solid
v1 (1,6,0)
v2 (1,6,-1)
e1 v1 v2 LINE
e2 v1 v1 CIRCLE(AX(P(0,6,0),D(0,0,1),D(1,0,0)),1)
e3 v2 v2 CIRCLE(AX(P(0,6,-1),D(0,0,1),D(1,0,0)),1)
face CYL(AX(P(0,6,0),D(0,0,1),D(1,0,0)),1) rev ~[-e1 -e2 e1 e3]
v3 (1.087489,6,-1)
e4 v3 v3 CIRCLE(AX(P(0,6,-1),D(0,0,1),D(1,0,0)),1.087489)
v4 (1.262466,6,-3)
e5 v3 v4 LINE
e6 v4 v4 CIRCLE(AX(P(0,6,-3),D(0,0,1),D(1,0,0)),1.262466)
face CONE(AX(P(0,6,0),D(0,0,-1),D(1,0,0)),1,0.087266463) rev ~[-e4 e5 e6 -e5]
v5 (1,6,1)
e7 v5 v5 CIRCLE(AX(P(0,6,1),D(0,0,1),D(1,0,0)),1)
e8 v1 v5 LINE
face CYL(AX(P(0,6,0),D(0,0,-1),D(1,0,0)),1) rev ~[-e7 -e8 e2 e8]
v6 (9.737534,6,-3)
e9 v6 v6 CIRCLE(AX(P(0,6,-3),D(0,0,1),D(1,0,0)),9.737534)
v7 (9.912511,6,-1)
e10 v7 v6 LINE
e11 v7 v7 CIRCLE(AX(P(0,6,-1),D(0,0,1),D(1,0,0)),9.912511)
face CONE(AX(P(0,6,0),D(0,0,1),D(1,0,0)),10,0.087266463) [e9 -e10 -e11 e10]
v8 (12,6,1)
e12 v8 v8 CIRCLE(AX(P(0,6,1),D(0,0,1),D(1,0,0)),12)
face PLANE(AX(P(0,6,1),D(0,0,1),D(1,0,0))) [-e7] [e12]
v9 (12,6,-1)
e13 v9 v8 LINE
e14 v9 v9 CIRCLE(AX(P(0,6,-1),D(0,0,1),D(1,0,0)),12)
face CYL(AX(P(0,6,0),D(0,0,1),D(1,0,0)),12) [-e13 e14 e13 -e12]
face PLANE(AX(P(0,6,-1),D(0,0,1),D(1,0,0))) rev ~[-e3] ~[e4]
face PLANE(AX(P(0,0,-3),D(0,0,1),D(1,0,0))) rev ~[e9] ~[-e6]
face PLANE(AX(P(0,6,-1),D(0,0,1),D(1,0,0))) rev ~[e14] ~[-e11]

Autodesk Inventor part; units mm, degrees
ref_plane "YZ Plane" through (0, 0, 0) normal (1, 0, 0) x (0, 1, 0)
ref_plane "XZ Plane" through (0, 0, 0) normal (0, 1, 0) x (-1, 0, 0)
ref_plane "XY Plane" through (0, 0, 0) normal (0, 0, 1) x (1, 0, 0)
ref_plane "Arbeitsebene1" through (0, 0, 0) normal (0, 0, 1) x (1, 0, 0)
sketch "Skizze1" plane through (0, 0, 0) normal (0, 0, 1) x (1, 0, 0)
  line L0 (-6, -30.9) -> (-6, -18.4)
  line L1 (-6, -30.9) -> (-19.3, -30.9)
  line L2 (-19.3, -30.9) -> (-19.3, -33.9)
  line L3 (10.7, -33.9) -> (-19.3, -33.9)
  line L4 (10.7, -30.9) -> (10.7, -33.9)
  line L5 (10.7, -30.9) -> (6, -30.9)
  line L6 (6, -18.4) -> (6, -30.9)
  line L7 (16.5, -18.4) -> (6, -18.4)
  line L8 (16.5, -15.118081) -> (16.5, -18.4)
  line L9 (21.118081, -10.5) -> (16.5, -15.118081)
  line L10 (24.4, -10.5) -> (21.118081, -10.5)
  line L11 (24.4, 22.5) -> (24.4, -10.5)
  line L12 (21.118081, 22.5) -> (24.4, 22.5)
  line L13 (16.5, 27.118081) -> (21.118081, 22.5)
  line L14 (16.5, 30.4) -> (16.5, 27.118081)
  line L15 (-16.5, 30.4) -> (-2.249898, 30.4)
  line L16 (-16.5, 27.118081) -> (-16.5, 30.4)
  line L17 (-21.118081, 22.5) -> (-16.5, 27.118081)
  line L18 (-24.4, 22.5) -> (-21.118081, 22.5)
  line L19 (-24.4, -10.5) -> (-24.4, 22.5)
  line L20 (-21.118081, -10.5) -> (-24.4, -10.5)
  line L21 (-16.5, -15.118081) -> (-21.118081, -10.5)
  line L22 (-16.5, -18.4) -> (-16.5, -15.118081)
  line L23 (-6, -18.4) -> (-16.5, -18.4)
  spline S0 degree 2 poles (21.854355, -9.517776) (21.708528, -9.626528) (21.308123, -9.745166) (21.028828, -9.745166) knots 0 0 0 1 2 2 2
  spline S1 degree 2 poles (21.028828, -9.745166) (20.776721, -9.745166) (20.324412, -9.633942) (20.176113, -9.559793) knots 0 0 0 1 2 2 2
  line L24 (20.176113, -9.559793) -> (20.176113, -8.954242)
  line L25 (20.176113, -8.954242) -> (20.235433, -8.954242)
  spline S2 degree 2 poles (20.235433, -8.954242) (20.287337, -8.993788) (20.418334, -9.087711) (20.534501, -9.139615) knots 0 0 0 1 2 2 2
  spline S3 degree 2 poles (20.534501, -9.139615) (20.635838, -9.186576) (20.885473, -9.25331) (21.033771, -9.25331) knots 0 0 0 1 2 2 2
  spline S4 degree 2 poles (21.033771, -9.25331) (21.184541, -9.25331) (21.416875, -9.159388) (21.416875, -9.058051) knots 0 0 0 1 2 2 2
  spline S5 degree 2 poles (21.416875, -9.058051) (21.416875, -8.978959) (21.310595, -8.894923) (21.157353, -8.86032) knots 0 0 0 1 2 2 2
  spline S6 degree 2 poles (21.157353, -8.86032) (21.075789, -8.838075) (20.826154, -8.791114) (20.72976, -8.761455) knots 0 0 0 1 2 2 2
  spline S7 degree 2 poles (20.72976, -8.761455) (20.45788, -8.677419) (20.186, -8.348691) (20.186, -8.079283) knots 0 0 0 1 2 2 2
  spline S8 degree 2 poles (20.186, -8.079283) (20.186, -7.926041) (20.326883, -7.654161) (20.465295, -7.547881) knots 0 0 0 1 2 2 2
  spline S9 degree 2 poles (20.465295, -7.547881) (20.601235, -7.444072) (21.004112, -7.32049) (21.25869, -7.32049) knots 0 0 0 1 2 2 2
  spline S10 degree 2 poles (21.25869, -7.32049) (21.500911, -7.32049) (21.906259, -7.416884) (22.044671, -7.483618) knots 0 0 0 1 2 2 2
  line L26 (22.044671, -7.483618) -> (22.044671, -8.066925)
  line L27 (22.044671, -8.066925) -> (21.987823, -8.066925)
  spline S11 degree 2 poles (21.987823, -8.066925) (21.950749, -8.037265) (21.790092, -7.940871) (21.715943, -7.906268) knots 0 0 0 1 2 2 2
  spline S12 degree 2 poles (21.715943, -7.906268) (21.624493, -7.866722) (21.402045, -7.812346) (21.285878, -7.812346) knots 0 0 0 1 2 2 2
  spline S13 degree 2 poles (21.285878, -7.812346) (21.130165, -7.812346) (20.915133, -7.918626) (20.915133, -8.005134) knots 0 0 0 1 2 2 2
  spline S14 degree 2 poles (20.915133, -8.005134) (20.915133, -8.084226) (21.021413, -8.173205) (21.199371, -8.217694) knots 0 0 0 1 2 2 2
  spline S15 degree 2 poles (21.199371, -8.217694) (21.290822, -8.239939) (21.53057, -8.281957) (21.641794, -8.319032) knots 0 0 0 1 2 2 2
  spline S16 degree 2 poles (21.641794, -8.319032) (21.888958, -8.398124) (22.146008, -8.707079) (22.146008, -8.964129) knots 0 0 0 1 2 2 2
  spline S17 degree 2 poles (22.146008, -8.964129) (22.146008, -9.124785) (21.995238, -9.41891) (21.854355, -9.517776) knots 0 0 0 1 2 2 2
  spline S18 degree 2 poles (16.997588, -9.685847) (16.893779, -9.715506) (16.710878, -9.745166) (16.560108, -9.745166) knots 0 0 0 1 2 2 2
  spline S19 degree 2 poles (16.560108, -9.745166) (16.27587, -9.745166) (15.803787, -9.601811) (15.628301, -9.453513) knots 0 0 0 1 2 2 2
  spline S20 degree 2 poles (15.628301, -9.453513) (15.457758, -9.302743) (15.264971, -8.850434) (15.264971, -8.543951) knots 0 0 0 1 2 2 2
  spline S21 degree 2 poles (15.264971, -8.543951) (15.264971, -8.212751) (15.472588, -7.750555) (15.653018, -7.602257) knots 0 0 0 1 2 2 2
  spline S22 degree 2 poles (15.653018, -7.602257) (15.823561, -7.458902) (16.288228, -7.32049) (16.540335, -7.32049) knots 0 0 0 1 2 2 2
  spline S23 degree 2 poles (16.540335, -7.32049) (16.730651, -7.32049) (17.111283, -7.409469) (17.304071, -7.505863) knots 0 0 0 1 2 2 2
  line L28 (17.304071, -7.505863) -> (17.304071, -8.118829)
  line L29 (17.304071, -8.118829) -> (17.212621, -8.118829)
  spline S24 degree 2 poles (17.212621, -8.118829) (17.168131, -8.076811) (17.044549, -7.977946) (16.9704, -7.938399) knots 0 0 0 1 2 2 2
  spline S25 degree 2 poles (16.9704, -7.938399) (16.891308, -7.89391) (16.696048, -7.834591) (16.574938, -7.834591) knots 0 0 0 1 2 2 2
  spline S26 degree 2 poles (16.574938, -7.834591) (16.300587, -7.834591) (15.999047, -8.217694) (15.999047, -8.543951) knots 0 0 0 1 2 2 2
  spline S27 degree 2 poles (15.999047, -8.543951) (15.999047, -8.88998) (16.32036, -9.231066) (16.587296, -9.231066) knots 0 0 0 1 2 2 2
  spline S28 degree 2 poles (16.587296, -9.231066) (16.723236, -9.231066) (16.925911, -9.169275) (17.00006, -9.124785) knots 0 0 0 1 2 2 2
  spline S29 degree 2 poles (17.00006, -9.124785) (17.071737, -9.082767) (17.175546, -8.988845) (17.212621, -8.951771) knots 0 0 0 1 2 2 2
  line L30 (17.212621, -8.951771) -> (17.304071, -8.951771)
  line L31 (17.304071, -8.951771) -> (17.304071, -9.567208)
  spline S30 degree 2 poles (17.304071, -9.567208) (17.24228, -9.594396) (17.081624, -9.663602) (16.997588, -9.685847) knots 0 0 0 1 2 2 2
  spline S31 degree 2 poles (13.866024, -7.310604) (14.429557, -7.310604) (15.05241, -7.963116) (15.05241, -8.534064) knots 0 0 0 1 2 2 2
  spline S32 degree 2 poles (15.05241, -8.534064) (15.05241, -9.102541) (14.432029, -9.755053) (13.866024, -9.755053) knots 0 0 0 1 2 2 2
  spline S33 degree 2 poles (13.866024, -9.755053) (13.302491, -9.755053) (12.677167, -9.102541) (12.677167, -8.534064) knots 0 0 0 1 2 2 2
  spline S34 degree 2 poles (12.677167, -8.534064) (12.677167, -7.960644) (13.302491, -7.310604) (13.866024, -7.310604) knots 0 0 0 1 2 2 2
  spline S35 degree 2 poles (8.361688, -9.663602) (8.245522, -9.693262) (7.983528, -9.727865) (7.79074, -9.727865) knots 0 0 0 1 2 2 2
  spline S36 degree 2 poles (7.79074, -9.727865) (7.353261, -9.727865) (6.952855, -9.367006) (6.952855, -8.956714) knots 0 0 0 1 2 2 2
  line L32 (6.952855, -8.956714) -> (6.952855, -7.881552)
  line L33 (6.952855, -7.881552) -> (6.678504, -7.881552)
  line L34 (6.678504, -7.881552) -> (6.678504, -7.382281)
  line L35 (6.678504, -7.382281) -> (6.952855, -7.382281)
  line L36 (6.952855, -7.382281) -> (6.952855, -6.724826)
  line L37 (6.952855, -6.724826) -> (7.66963, -6.724826)
  line L38 (7.66963, -6.724826) -> (7.66963, -7.382281)
  line L39 (7.66963, -7.382281) -> (8.361688, -7.382281)
  line L40 (8.361688, -7.382281) -> (8.361688, -7.881552)
  line L41 (8.361688, -7.881552) -> (7.66963, -7.881552)
  line L42 (7.66963, -7.881552) -> (7.66963, -8.699664)
  spline S37 degree 2 poles (7.66963, -8.699664) (7.66963, -8.820774) (7.674573, -9.001203) (7.704233, -9.072881) knots 0 0 0 1 2 2 2
  spline S38 degree 2 poles (7.704233, -9.072881) (7.733893, -9.144558) (7.879719, -9.228594) (8.018131, -9.228594) knots 0 0 0 1 2 2 2
  spline S39 degree 2 poles (8.018131, -9.228594) (8.07745, -9.228594) (8.262823, -9.179161) (8.299898, -9.159388) knots 0 0 0 1 2 2 2
  line L43 (8.299898, -9.159388) -> (8.361688, -9.159388)
  line L44 (8.361688, -9.159388) -> (8.361688, -9.663602)
  spline S40 degree 2 poles (-8.240297, -8.729323) (-8.240297, -9.184105) (-8.9546, -9.737751) (-9.562623, -9.737751) knots 0 0 0 1 2 2 2
  spline S41 degree 2 poles (-9.562623, -9.737751) (-9.913596, -9.737751) (-10.442526, -9.601811) (-10.669917, -9.502946) knots 0 0 0 1 2 2 2
  line L45 (-10.669917, -9.502946) -> (-10.669917, -8.776284)
  line L46 (-10.669917, -8.776284) -> (-10.600711, -8.776284)
  spline S42 degree 2 poles (-10.600711, -8.776284) (-10.370848, -8.971544) (-9.819673, -9.181633) (-9.560152, -9.181633) knots 0 0 0 1 2 2 2
  spline S43 degree 2 poles (-9.560152, -9.181633) (-9.493417, -9.181633) (-9.278385, -9.151973) (-9.214122, -9.122314) knots 0 0 0 1 2 2 2
  spline S44 degree 2 poles (-9.214122, -9.122314) (-9.13503, -9.087711) (-9.023806, -8.961657) (-9.023806, -8.86032) knots 0 0 0 1 2 2 2
  spline S45 degree 2 poles (-9.023806, -8.86032) (-9.023806, -8.744153) (-9.204236, -8.600798) (-9.327818, -8.568667) knots 0 0 0 1 2 2 2
  spline S46 degree 2 poles (-9.327818, -8.568667) (-9.483531, -8.526649) (-9.836975, -8.454972) (-9.992688, -8.400596) knots 0 0 0 1 2 2 2
  spline S47 degree 2 poles (-9.992688, -8.400596) (-10.346132, -8.277014) (-10.652615, -7.854364) (-10.652615, -7.537994) knots 0 0 0 1 2 2 2
  spline S48 degree 2 poles (-10.652615, -7.537994) (-10.652615, -7.110401) (-9.928425, -6.578999) (-9.384665, -6.578999) knots 0 0 0 1 2 2 2
  spline S49 degree 2 poles (-9.384665, -6.578999) (-9.112785, -6.578999) (-8.573968, -6.690223) (-8.361408, -6.784145) knots 0 0 0 1 2 2 2
  line L47 (-8.361408, -6.784145) -> (-8.361408, -7.481147)
  line L48 (-8.361408, -7.481147) -> (-8.428142, -7.481147)
  spline S50 degree 2 poles (-8.428142, -7.481147) (-8.598685, -7.33532) (-9.088069, -7.135117) (-9.345119, -7.135117) knots 0 0 0 1 2 2 2
  spline S51 degree 2 poles (-9.345119, -7.135117) (-9.446456, -7.135117) (-9.604641, -7.164777) (-9.69362, -7.204323) knots 0 0 0 1 2 2 2
  spline S52 degree 2 poles (-9.69362, -7.204323) (-9.765297, -7.236455) (-9.869106, -7.36498) (-9.869106, -7.444072) knots 0 0 0 1 2 2 2
  spline S53 degree 2 poles (-9.869106, -7.444072) (-9.869106, -7.562711) (-9.703506, -7.698651) (-9.466229, -7.753027) knots 0 0 0 1 2 2 2
  spline S54 degree 2 poles (-9.466229, -7.753027) (-9.312988, -7.78763) (-9.02875, -7.854364) (-8.865622, -7.911211) knots 0 0 0 1 2 2 2
  spline S55 degree 2 poles (-8.865622, -7.911211) (-8.549252, -8.027378) (-8.240297, -8.412954) (-8.240297, -8.729323) knots 0 0 0 1 2 2 2
  line L49 (-14.466351, -8.049623) -> (-13.334341, -9.683375)
  line L50 (-13.334341, -9.683375) -> (-14.261205, -9.683375)
  line L51 (-14.261205, -9.683375) -> (-15.089204, -8.445085)
  line L52 (-15.089204, -8.445085) -> (-15.239973, -8.652703)
  line L53 (-15.239973, -8.652703) -> (-15.239973, -9.683375)
  line L54 (-15.239973, -9.683375) -> (-16.006181, -9.683375)
  line L55 (-16.006181, -9.683375) -> (-16.006181, -6.633375)
  line L56 (-16.006181, -6.633375) -> (-15.239973, -6.633375)
  line L57 (-15.239973, -6.633375) -> (-15.239973, -7.995247)
  line L58 (-15.239973, -7.995247) -> (-14.261205, -6.633375)
  line L59 (-14.261205, -6.633375) -> (-13.378831, -6.633375)
  line L60 (-13.378831, -6.633375) -> (-14.466351, -8.049623)
  line L61 (-11.023361, -9.683375) -> (-13.084706, -9.683375)
  line L62 (-13.084706, -9.683375) -> (-13.084706, -6.633375)
  line L63 (-13.084706, -6.633375) -> (-11.023361, -6.633375)
  line L64 (-11.023361, -6.633375) -> (-11.023361, -7.21421)
  line L65 (-11.023361, -7.21421) -> (-12.323442, -7.21421)
  line L66 (-12.323442, -7.21421) -> (-12.323442, -7.750555)
  line L67 (-12.323442, -7.750555) -> (-11.124698, -7.750555)
  line L68 (-11.124698, -7.750555) -> (-11.124698, -8.33139)
  line L69 (-11.124698, -8.33139) -> (-12.323442, -8.33139)
  line L70 (-12.323442, -8.33139) -> (-12.323442, -9.102541)
  line L71 (-12.323442, -9.102541) -> (-11.023361, -9.102541)
  line L72 (-11.023361, -9.102541) -> (-11.023361, -9.683375)
  line L73 (-5.575873, -8.42284) -> (-5.575873, -8.971544)
  line L74 (-5.575873, -8.971544) -> (-5.988636, -8.971544)
  line L75 (-5.988636, -8.971544) -> (-5.988636, -9.69079)
  line L76 (-5.988636, -9.69079) -> (-6.727655, -9.69079)
  line L77 (-6.727655, -9.69079) -> (-6.727655, -8.971544)
  line L78 (-6.727655, -8.971544) -> (-8.072226, -8.971544)
  line L79 (-8.072226, -8.971544) -> (-8.072226, -8.403067)
  line L80 (-8.072226, -8.403067) -> (-6.752372, -6.633375)
  line L81 (-6.752372, -6.633375) -> (-5.988636, -6.633375)
  line L82 (-5.988636, -6.633375) -> (-5.988636, -8.42284)
  line L83 (-5.988636, -8.42284) -> (-5.575873, -8.42284)
  spline S56 degree 2 poles (-3.245119, -6.984348) (-3.106707, -7.18455) (-2.980654, -7.775271) (-2.980654, -8.158375) knots 0 0 0 1 2 2 2
  spline S57 degree 2 poles (-2.980654, -8.158375) (-2.980654, -8.553837) (-3.106707, -9.14703) (-3.247591, -9.347233) knots 0 0 0 1 2 2 2
  spline S58 degree 2 poles (-3.247591, -9.347233) (-3.386002, -9.544964) (-3.833369, -9.747638) (-4.154681, -9.747638) knots 0 0 0 1 2 2 2
  spline S59 degree 2 poles (-4.154681, -9.747638) (-4.478466, -9.747638) (-4.92336, -9.544964) (-5.064244, -9.342289) knots 0 0 0 1 2 2 2
  spline S60 degree 2 poles (-5.064244, -9.342289) (-5.205127, -9.142087) (-5.331181, -8.553837) (-5.331181, -8.158375) knots 0 0 0 1 2 2 2
  spline S61 degree 2 poles (-5.331181, -8.158375) (-5.331181, -7.753027) (-5.205127, -7.179607) (-5.061772, -6.971989) knots 0 0 0 1 2 2 2
  spline S62 degree 2 poles (-5.061772, -6.971989) (-4.918417, -6.769315) (-4.466108, -6.571584) (-4.154681, -6.571584) knots 0 0 0 1 2 2 2
  spline S63 degree 2 poles (-4.154681, -6.571584) (-3.825954, -6.571584) (-3.386002, -6.779202) (-3.245119, -6.984348) knots 0 0 0 1 2 2 2
  spline S64 degree 2 poles (-0.573279, -6.984348) (-0.434868, -7.18455) (-0.308814, -7.775271) (-0.308814, -8.158375) knots 0 0 0 1 2 2 2
  spline S65 degree 2 poles (-0.308814, -8.158375) (-0.308814, -8.553837) (-0.434868, -9.14703) (-0.575751, -9.347233) knots 0 0 0 1 2 2 2
  spline S66 degree 2 poles (-0.575751, -9.347233) (-0.714163, -9.544964) (-1.161529, -9.747638) (-1.482842, -9.747638) knots 0 0 0 1 2 2 2
  spline S67 degree 2 poles (-1.482842, -9.747638) (-1.806626, -9.747638) (-2.251521, -9.544964) (-2.392404, -9.342289) knots 0 0 0 1 2 2 2
  spline S68 degree 2 poles (-2.392404, -9.342289) (-2.533287, -9.142087) (-2.659341, -8.553837) (-2.659341, -8.158375) knots 0 0 0 1 2 2 2
  spline S69 degree 2 poles (-2.659341, -8.158375) (-2.659341, -7.753027) (-2.533287, -7.179607) (-2.389933, -6.971989) knots 0 0 0 1 2 2 2
  spline S70 degree 2 poles (-2.389933, -6.971989) (-2.246578, -6.769315) (-1.794268, -6.571584) (-1.482842, -6.571584) knots 0 0 0 1 2 2 2
  spline S71 degree 2 poles (-1.482842, -6.571584) (-1.154114, -6.571584) (-0.714163, -6.779202) (-0.573279, -6.984348) knots 0 0 0 1 2 2 2
  line L84 (1.834095, -9.683375) -> (1.067888, -9.683375)
  line L85 (1.067888, -9.683375) -> (2.09856, -6.633375)
  line L86 (2.09856, -6.633375) -> (2.933974, -6.633375)
  line L87 (2.933974, -6.633375) -> (3.964646, -9.683375)
  line L88 (3.964646, -9.683375) -> (3.176194, -9.683375)
  line L89 (3.176194, -9.683375) -> (2.985878, -9.060523)
  line L90 (2.985878, -9.060523) -> (2.026883, -9.060523)
  line L91 (2.026883, -9.060523) -> (1.834095, -9.683375)
  line L92 (6.362134, -7.382281) -> (6.362134, -9.683375)
  line L93 (6.362134, -9.683375) -> (5.645359, -9.683375)
  line L94 (5.645359, -9.683375) -> (5.645359, -9.428797)
  spline S72 degree 2 poles (5.645359, -9.428797) (5.459987, -9.58451) (5.14856, -9.747638) (4.933528, -9.747638) knots 0 0 0 1 2 2 2
  spline S73 degree 2 poles (4.933528, -9.747638) (4.592442, -9.747638) (4.209338, -9.315101) (4.209338, -8.880093) knots 0 0 0 1 2 2 2
  line L95 (4.209338, -8.880093) -> (4.209338, -7.382281)
  line L96 (4.209338, -7.382281) -> (4.931056, -7.382281)
  line L97 (4.931056, -7.382281) -> (4.931056, -8.524177)
  spline S74 degree 2 poles (4.931056, -8.524177) (4.931056, -8.702135) (4.948358, -8.929526) (4.982961, -9.006147) knots 0 0 0 1 2 2 2
  spline S75 degree 2 poles (4.982961, -9.006147) (5.017564, -9.077824) (5.153504, -9.151973) (5.277085, -9.151973) knots 0 0 0 1 2 2 2
  spline S76 degree 2 poles (5.277085, -9.151973) (5.351235, -9.151973) (5.558852, -9.077824) (5.645359, -9.013562) knots 0 0 0 1 2 2 2
  line L98 (5.645359, -9.013562) -> (5.645359, -7.382281)
  line L99 (5.645359, -7.382281) -> (6.362134, -7.382281)
  spline S77 degree 2 poles (9.674128, -7.310604) (10.237661, -7.310604) (10.860513, -7.963116) (10.860513, -8.534064) knots 0 0 0 1 2 2 2
  spline S78 degree 2 poles (10.860513, -8.534064) (10.860513, -9.102541) (10.240133, -9.755053) (9.674128, -9.755053) knots 0 0 0 1 2 2 2
  spline S79 degree 2 poles (9.674128, -9.755053) (9.110594, -9.755053) (8.48527, -9.102541) (8.48527, -8.534064) knots 0 0 0 1 2 2 2
  spline S80 degree 2 poles (8.48527, -8.534064) (8.48527, -7.960644) (9.110594, -7.310604) (9.674128, -7.310604) knots 0 0 0 1 2 2 2
  line L100 (12.71177, -6.51968) -> (12.71177, -7.038724)
  line L101 (12.71177, -7.038724) -> (12.657394, -7.038724)
  spline S81 degree 2 poles (12.657394, -7.038724) (12.615376, -7.026365) (12.43989, -6.986819) (12.363269, -6.986819) knots 0 0 0 1 2 2 2
  spline S82 degree 2 poles (12.363269, -6.986819) (12.145765, -6.986819) (11.98758, -7.145004) (11.98758, -7.36498) knots 0 0 0 1 2 2 2
  line L102 (11.98758, -7.36498) -> (11.98758, -7.382281)
  line L103 (11.98758, -7.382281) -> (12.558528, -7.382281)
  line L104 (12.558528, -7.382281) -> (12.558528, -7.881552)
  line L105 (12.558528, -7.881552) -> (12.012296, -7.881552)
  line L106 (12.012296, -7.881552) -> (12.012296, -9.683375)
  line L107 (12.012296, -9.683375) -> (11.295522, -9.683375)
  line L108 (11.295522, -9.683375) -> (11.295522, -7.881552)
  line L109 (11.295522, -7.881552) -> (11.008812, -7.881552)
  line L110 (11.008812, -7.881552) -> (11.008812, -7.382281)
  line L111 (11.008812, -7.382281) -> (11.295522, -7.382281)
  line L112 (11.295522, -7.382281) -> (11.295522, -7.318019)
  spline S83 degree 2 poles (11.295522, -7.318019) (11.295522, -6.89784) (11.737945, -6.477662) (12.187783, -6.477662) knots 0 0 0 1 2 2 2
  spline S84 degree 2 poles (12.187783, -6.477662) (12.343496, -6.477662) (12.612904, -6.499907) (12.71177, -6.51968) knots 0 0 0 1 2 2 2
  line L113 (19.780651, -7.382281) -> (19.780651, -9.683375)
  line L114 (19.780651, -9.683375) -> (19.063877, -9.683375)
  line L115 (19.063877, -9.683375) -> (19.063877, -9.428797)
  spline S85 degree 2 poles (19.063877, -9.428797) (18.878504, -9.58451) (18.567078, -9.747638) (18.352045, -9.747638) knots 0 0 0 1 2 2 2
  spline S86 degree 2 poles (18.352045, -9.747638) (18.010959, -9.747638) (17.627856, -9.315101) (17.627856, -8.880093) knots 0 0 0 1 2 2 2
  line L116 (17.627856, -8.880093) -> (17.627856, -7.382281)
  line L117 (17.627856, -7.382281) -> (18.349574, -7.382281)
  line L118 (18.349574, -7.382281) -> (18.349574, -8.524177)
  spline S87 degree 2 poles (18.349574, -8.524177) (18.349574, -8.702135) (18.366875, -8.929526) (18.401478, -9.006147) knots 0 0 0 1 2 2 2
  spline S88 degree 2 poles (18.401478, -9.006147) (18.436081, -9.077824) (18.572021, -9.151973) (18.695603, -9.151973) knots 0 0 0 1 2 2 2
  spline S89 degree 2 poles (18.695603, -9.151973) (18.769752, -9.151973) (18.977369, -9.077824) (19.063877, -9.013562) knots 0 0 0 1 2 2 2
  line L119 (19.063877, -9.013562) -> (19.063877, -7.382281)
  line L120 (19.063877, -7.382281) -> (19.780651, -7.382281)
  arc A0 (2.5, 17.25833) -> (-11, 9.464102) centre (-2, 9.464102) ccw
  line L121 (8.5, 13.794229) -> (2.5, 17.25833)
  arc A1 (8.5, -1.794229) -> (8.5, 13.794229) centre (4, 6) ccw
  line L122 (2.5, -5.25833) -> (8.5, -1.794229)
  arc A2 (-11, 2.535898) -> (2.5, -5.25833) centre (-2, 2.535898) ccw
  line L123 (-11, 9.464102) -> (-11, 2.535898)
  line L124 (2, 16.392305) -> (8, 12.928203)
  line L125 (-10, 2.535898) -> (-10, 9.464102)
  line L126 (12, -3.206349) -> (-12, -3.206349)
  line L127 (8, -0.928203) -> (2, -4.392305)
  circle A3 centre (0, 6) radius 10
  circle A4 centre (0, 6) radius 1
  arc A5 (-2.249898, 30.4) -> (2.249898, 30.4) centre (0, 28.054695) ccw
  line L128 (2.249898, 30.4) -> (16.5, 30.4)
  point P0 (0, 0)
  dimension "d0" = 2
sketch "Skizze1 outline for Extrusion1" plane through (0, 0, 0) normal (0, 0, 1) x (1, 0, 0)
  circle A0 centre (0, 6) radius 10
  circle A1 centre (0, 6) radius 1
extrude "Extrusion1" add sketch "Skizze1 outline for Extrusion1" against normal blind 3 draft -5
ref_plane "Arbeitsebene2" through (0, 6, -1) normal (0, 0, -1) x (-1, 0, 0)
sketch "Skizze4" plane through (0, 6, -1) normal (0, 0, -1) x (-1, 0, 0)
  circle A0 centre (0, 0) radius 10
  circle A1 centre (0, 0) radius 9.737534
  point P0 (0, -6)
sketch "Skizze5" plane through (0, 6, 0) normal (0, 0, 1) x (1, 0, 0)
  circle A0 centre (0, 0) radius 1 projected
  circle A1 centre (0, 0) radius 10 projected
  circle A2 centre (0, 0) radius 1 projected
  circle A3 centre (0, 0) radius 12
  point P0 (0, -6)
  dimension "d9" = 24
extrude "Extrusion4" add sketch "Skizze5" along normal mid plane 2 contours A1 | A3
properties part number "20_Cube_Insert_Autofocus_KES400a_mirrorinsert_alignmenttube"
